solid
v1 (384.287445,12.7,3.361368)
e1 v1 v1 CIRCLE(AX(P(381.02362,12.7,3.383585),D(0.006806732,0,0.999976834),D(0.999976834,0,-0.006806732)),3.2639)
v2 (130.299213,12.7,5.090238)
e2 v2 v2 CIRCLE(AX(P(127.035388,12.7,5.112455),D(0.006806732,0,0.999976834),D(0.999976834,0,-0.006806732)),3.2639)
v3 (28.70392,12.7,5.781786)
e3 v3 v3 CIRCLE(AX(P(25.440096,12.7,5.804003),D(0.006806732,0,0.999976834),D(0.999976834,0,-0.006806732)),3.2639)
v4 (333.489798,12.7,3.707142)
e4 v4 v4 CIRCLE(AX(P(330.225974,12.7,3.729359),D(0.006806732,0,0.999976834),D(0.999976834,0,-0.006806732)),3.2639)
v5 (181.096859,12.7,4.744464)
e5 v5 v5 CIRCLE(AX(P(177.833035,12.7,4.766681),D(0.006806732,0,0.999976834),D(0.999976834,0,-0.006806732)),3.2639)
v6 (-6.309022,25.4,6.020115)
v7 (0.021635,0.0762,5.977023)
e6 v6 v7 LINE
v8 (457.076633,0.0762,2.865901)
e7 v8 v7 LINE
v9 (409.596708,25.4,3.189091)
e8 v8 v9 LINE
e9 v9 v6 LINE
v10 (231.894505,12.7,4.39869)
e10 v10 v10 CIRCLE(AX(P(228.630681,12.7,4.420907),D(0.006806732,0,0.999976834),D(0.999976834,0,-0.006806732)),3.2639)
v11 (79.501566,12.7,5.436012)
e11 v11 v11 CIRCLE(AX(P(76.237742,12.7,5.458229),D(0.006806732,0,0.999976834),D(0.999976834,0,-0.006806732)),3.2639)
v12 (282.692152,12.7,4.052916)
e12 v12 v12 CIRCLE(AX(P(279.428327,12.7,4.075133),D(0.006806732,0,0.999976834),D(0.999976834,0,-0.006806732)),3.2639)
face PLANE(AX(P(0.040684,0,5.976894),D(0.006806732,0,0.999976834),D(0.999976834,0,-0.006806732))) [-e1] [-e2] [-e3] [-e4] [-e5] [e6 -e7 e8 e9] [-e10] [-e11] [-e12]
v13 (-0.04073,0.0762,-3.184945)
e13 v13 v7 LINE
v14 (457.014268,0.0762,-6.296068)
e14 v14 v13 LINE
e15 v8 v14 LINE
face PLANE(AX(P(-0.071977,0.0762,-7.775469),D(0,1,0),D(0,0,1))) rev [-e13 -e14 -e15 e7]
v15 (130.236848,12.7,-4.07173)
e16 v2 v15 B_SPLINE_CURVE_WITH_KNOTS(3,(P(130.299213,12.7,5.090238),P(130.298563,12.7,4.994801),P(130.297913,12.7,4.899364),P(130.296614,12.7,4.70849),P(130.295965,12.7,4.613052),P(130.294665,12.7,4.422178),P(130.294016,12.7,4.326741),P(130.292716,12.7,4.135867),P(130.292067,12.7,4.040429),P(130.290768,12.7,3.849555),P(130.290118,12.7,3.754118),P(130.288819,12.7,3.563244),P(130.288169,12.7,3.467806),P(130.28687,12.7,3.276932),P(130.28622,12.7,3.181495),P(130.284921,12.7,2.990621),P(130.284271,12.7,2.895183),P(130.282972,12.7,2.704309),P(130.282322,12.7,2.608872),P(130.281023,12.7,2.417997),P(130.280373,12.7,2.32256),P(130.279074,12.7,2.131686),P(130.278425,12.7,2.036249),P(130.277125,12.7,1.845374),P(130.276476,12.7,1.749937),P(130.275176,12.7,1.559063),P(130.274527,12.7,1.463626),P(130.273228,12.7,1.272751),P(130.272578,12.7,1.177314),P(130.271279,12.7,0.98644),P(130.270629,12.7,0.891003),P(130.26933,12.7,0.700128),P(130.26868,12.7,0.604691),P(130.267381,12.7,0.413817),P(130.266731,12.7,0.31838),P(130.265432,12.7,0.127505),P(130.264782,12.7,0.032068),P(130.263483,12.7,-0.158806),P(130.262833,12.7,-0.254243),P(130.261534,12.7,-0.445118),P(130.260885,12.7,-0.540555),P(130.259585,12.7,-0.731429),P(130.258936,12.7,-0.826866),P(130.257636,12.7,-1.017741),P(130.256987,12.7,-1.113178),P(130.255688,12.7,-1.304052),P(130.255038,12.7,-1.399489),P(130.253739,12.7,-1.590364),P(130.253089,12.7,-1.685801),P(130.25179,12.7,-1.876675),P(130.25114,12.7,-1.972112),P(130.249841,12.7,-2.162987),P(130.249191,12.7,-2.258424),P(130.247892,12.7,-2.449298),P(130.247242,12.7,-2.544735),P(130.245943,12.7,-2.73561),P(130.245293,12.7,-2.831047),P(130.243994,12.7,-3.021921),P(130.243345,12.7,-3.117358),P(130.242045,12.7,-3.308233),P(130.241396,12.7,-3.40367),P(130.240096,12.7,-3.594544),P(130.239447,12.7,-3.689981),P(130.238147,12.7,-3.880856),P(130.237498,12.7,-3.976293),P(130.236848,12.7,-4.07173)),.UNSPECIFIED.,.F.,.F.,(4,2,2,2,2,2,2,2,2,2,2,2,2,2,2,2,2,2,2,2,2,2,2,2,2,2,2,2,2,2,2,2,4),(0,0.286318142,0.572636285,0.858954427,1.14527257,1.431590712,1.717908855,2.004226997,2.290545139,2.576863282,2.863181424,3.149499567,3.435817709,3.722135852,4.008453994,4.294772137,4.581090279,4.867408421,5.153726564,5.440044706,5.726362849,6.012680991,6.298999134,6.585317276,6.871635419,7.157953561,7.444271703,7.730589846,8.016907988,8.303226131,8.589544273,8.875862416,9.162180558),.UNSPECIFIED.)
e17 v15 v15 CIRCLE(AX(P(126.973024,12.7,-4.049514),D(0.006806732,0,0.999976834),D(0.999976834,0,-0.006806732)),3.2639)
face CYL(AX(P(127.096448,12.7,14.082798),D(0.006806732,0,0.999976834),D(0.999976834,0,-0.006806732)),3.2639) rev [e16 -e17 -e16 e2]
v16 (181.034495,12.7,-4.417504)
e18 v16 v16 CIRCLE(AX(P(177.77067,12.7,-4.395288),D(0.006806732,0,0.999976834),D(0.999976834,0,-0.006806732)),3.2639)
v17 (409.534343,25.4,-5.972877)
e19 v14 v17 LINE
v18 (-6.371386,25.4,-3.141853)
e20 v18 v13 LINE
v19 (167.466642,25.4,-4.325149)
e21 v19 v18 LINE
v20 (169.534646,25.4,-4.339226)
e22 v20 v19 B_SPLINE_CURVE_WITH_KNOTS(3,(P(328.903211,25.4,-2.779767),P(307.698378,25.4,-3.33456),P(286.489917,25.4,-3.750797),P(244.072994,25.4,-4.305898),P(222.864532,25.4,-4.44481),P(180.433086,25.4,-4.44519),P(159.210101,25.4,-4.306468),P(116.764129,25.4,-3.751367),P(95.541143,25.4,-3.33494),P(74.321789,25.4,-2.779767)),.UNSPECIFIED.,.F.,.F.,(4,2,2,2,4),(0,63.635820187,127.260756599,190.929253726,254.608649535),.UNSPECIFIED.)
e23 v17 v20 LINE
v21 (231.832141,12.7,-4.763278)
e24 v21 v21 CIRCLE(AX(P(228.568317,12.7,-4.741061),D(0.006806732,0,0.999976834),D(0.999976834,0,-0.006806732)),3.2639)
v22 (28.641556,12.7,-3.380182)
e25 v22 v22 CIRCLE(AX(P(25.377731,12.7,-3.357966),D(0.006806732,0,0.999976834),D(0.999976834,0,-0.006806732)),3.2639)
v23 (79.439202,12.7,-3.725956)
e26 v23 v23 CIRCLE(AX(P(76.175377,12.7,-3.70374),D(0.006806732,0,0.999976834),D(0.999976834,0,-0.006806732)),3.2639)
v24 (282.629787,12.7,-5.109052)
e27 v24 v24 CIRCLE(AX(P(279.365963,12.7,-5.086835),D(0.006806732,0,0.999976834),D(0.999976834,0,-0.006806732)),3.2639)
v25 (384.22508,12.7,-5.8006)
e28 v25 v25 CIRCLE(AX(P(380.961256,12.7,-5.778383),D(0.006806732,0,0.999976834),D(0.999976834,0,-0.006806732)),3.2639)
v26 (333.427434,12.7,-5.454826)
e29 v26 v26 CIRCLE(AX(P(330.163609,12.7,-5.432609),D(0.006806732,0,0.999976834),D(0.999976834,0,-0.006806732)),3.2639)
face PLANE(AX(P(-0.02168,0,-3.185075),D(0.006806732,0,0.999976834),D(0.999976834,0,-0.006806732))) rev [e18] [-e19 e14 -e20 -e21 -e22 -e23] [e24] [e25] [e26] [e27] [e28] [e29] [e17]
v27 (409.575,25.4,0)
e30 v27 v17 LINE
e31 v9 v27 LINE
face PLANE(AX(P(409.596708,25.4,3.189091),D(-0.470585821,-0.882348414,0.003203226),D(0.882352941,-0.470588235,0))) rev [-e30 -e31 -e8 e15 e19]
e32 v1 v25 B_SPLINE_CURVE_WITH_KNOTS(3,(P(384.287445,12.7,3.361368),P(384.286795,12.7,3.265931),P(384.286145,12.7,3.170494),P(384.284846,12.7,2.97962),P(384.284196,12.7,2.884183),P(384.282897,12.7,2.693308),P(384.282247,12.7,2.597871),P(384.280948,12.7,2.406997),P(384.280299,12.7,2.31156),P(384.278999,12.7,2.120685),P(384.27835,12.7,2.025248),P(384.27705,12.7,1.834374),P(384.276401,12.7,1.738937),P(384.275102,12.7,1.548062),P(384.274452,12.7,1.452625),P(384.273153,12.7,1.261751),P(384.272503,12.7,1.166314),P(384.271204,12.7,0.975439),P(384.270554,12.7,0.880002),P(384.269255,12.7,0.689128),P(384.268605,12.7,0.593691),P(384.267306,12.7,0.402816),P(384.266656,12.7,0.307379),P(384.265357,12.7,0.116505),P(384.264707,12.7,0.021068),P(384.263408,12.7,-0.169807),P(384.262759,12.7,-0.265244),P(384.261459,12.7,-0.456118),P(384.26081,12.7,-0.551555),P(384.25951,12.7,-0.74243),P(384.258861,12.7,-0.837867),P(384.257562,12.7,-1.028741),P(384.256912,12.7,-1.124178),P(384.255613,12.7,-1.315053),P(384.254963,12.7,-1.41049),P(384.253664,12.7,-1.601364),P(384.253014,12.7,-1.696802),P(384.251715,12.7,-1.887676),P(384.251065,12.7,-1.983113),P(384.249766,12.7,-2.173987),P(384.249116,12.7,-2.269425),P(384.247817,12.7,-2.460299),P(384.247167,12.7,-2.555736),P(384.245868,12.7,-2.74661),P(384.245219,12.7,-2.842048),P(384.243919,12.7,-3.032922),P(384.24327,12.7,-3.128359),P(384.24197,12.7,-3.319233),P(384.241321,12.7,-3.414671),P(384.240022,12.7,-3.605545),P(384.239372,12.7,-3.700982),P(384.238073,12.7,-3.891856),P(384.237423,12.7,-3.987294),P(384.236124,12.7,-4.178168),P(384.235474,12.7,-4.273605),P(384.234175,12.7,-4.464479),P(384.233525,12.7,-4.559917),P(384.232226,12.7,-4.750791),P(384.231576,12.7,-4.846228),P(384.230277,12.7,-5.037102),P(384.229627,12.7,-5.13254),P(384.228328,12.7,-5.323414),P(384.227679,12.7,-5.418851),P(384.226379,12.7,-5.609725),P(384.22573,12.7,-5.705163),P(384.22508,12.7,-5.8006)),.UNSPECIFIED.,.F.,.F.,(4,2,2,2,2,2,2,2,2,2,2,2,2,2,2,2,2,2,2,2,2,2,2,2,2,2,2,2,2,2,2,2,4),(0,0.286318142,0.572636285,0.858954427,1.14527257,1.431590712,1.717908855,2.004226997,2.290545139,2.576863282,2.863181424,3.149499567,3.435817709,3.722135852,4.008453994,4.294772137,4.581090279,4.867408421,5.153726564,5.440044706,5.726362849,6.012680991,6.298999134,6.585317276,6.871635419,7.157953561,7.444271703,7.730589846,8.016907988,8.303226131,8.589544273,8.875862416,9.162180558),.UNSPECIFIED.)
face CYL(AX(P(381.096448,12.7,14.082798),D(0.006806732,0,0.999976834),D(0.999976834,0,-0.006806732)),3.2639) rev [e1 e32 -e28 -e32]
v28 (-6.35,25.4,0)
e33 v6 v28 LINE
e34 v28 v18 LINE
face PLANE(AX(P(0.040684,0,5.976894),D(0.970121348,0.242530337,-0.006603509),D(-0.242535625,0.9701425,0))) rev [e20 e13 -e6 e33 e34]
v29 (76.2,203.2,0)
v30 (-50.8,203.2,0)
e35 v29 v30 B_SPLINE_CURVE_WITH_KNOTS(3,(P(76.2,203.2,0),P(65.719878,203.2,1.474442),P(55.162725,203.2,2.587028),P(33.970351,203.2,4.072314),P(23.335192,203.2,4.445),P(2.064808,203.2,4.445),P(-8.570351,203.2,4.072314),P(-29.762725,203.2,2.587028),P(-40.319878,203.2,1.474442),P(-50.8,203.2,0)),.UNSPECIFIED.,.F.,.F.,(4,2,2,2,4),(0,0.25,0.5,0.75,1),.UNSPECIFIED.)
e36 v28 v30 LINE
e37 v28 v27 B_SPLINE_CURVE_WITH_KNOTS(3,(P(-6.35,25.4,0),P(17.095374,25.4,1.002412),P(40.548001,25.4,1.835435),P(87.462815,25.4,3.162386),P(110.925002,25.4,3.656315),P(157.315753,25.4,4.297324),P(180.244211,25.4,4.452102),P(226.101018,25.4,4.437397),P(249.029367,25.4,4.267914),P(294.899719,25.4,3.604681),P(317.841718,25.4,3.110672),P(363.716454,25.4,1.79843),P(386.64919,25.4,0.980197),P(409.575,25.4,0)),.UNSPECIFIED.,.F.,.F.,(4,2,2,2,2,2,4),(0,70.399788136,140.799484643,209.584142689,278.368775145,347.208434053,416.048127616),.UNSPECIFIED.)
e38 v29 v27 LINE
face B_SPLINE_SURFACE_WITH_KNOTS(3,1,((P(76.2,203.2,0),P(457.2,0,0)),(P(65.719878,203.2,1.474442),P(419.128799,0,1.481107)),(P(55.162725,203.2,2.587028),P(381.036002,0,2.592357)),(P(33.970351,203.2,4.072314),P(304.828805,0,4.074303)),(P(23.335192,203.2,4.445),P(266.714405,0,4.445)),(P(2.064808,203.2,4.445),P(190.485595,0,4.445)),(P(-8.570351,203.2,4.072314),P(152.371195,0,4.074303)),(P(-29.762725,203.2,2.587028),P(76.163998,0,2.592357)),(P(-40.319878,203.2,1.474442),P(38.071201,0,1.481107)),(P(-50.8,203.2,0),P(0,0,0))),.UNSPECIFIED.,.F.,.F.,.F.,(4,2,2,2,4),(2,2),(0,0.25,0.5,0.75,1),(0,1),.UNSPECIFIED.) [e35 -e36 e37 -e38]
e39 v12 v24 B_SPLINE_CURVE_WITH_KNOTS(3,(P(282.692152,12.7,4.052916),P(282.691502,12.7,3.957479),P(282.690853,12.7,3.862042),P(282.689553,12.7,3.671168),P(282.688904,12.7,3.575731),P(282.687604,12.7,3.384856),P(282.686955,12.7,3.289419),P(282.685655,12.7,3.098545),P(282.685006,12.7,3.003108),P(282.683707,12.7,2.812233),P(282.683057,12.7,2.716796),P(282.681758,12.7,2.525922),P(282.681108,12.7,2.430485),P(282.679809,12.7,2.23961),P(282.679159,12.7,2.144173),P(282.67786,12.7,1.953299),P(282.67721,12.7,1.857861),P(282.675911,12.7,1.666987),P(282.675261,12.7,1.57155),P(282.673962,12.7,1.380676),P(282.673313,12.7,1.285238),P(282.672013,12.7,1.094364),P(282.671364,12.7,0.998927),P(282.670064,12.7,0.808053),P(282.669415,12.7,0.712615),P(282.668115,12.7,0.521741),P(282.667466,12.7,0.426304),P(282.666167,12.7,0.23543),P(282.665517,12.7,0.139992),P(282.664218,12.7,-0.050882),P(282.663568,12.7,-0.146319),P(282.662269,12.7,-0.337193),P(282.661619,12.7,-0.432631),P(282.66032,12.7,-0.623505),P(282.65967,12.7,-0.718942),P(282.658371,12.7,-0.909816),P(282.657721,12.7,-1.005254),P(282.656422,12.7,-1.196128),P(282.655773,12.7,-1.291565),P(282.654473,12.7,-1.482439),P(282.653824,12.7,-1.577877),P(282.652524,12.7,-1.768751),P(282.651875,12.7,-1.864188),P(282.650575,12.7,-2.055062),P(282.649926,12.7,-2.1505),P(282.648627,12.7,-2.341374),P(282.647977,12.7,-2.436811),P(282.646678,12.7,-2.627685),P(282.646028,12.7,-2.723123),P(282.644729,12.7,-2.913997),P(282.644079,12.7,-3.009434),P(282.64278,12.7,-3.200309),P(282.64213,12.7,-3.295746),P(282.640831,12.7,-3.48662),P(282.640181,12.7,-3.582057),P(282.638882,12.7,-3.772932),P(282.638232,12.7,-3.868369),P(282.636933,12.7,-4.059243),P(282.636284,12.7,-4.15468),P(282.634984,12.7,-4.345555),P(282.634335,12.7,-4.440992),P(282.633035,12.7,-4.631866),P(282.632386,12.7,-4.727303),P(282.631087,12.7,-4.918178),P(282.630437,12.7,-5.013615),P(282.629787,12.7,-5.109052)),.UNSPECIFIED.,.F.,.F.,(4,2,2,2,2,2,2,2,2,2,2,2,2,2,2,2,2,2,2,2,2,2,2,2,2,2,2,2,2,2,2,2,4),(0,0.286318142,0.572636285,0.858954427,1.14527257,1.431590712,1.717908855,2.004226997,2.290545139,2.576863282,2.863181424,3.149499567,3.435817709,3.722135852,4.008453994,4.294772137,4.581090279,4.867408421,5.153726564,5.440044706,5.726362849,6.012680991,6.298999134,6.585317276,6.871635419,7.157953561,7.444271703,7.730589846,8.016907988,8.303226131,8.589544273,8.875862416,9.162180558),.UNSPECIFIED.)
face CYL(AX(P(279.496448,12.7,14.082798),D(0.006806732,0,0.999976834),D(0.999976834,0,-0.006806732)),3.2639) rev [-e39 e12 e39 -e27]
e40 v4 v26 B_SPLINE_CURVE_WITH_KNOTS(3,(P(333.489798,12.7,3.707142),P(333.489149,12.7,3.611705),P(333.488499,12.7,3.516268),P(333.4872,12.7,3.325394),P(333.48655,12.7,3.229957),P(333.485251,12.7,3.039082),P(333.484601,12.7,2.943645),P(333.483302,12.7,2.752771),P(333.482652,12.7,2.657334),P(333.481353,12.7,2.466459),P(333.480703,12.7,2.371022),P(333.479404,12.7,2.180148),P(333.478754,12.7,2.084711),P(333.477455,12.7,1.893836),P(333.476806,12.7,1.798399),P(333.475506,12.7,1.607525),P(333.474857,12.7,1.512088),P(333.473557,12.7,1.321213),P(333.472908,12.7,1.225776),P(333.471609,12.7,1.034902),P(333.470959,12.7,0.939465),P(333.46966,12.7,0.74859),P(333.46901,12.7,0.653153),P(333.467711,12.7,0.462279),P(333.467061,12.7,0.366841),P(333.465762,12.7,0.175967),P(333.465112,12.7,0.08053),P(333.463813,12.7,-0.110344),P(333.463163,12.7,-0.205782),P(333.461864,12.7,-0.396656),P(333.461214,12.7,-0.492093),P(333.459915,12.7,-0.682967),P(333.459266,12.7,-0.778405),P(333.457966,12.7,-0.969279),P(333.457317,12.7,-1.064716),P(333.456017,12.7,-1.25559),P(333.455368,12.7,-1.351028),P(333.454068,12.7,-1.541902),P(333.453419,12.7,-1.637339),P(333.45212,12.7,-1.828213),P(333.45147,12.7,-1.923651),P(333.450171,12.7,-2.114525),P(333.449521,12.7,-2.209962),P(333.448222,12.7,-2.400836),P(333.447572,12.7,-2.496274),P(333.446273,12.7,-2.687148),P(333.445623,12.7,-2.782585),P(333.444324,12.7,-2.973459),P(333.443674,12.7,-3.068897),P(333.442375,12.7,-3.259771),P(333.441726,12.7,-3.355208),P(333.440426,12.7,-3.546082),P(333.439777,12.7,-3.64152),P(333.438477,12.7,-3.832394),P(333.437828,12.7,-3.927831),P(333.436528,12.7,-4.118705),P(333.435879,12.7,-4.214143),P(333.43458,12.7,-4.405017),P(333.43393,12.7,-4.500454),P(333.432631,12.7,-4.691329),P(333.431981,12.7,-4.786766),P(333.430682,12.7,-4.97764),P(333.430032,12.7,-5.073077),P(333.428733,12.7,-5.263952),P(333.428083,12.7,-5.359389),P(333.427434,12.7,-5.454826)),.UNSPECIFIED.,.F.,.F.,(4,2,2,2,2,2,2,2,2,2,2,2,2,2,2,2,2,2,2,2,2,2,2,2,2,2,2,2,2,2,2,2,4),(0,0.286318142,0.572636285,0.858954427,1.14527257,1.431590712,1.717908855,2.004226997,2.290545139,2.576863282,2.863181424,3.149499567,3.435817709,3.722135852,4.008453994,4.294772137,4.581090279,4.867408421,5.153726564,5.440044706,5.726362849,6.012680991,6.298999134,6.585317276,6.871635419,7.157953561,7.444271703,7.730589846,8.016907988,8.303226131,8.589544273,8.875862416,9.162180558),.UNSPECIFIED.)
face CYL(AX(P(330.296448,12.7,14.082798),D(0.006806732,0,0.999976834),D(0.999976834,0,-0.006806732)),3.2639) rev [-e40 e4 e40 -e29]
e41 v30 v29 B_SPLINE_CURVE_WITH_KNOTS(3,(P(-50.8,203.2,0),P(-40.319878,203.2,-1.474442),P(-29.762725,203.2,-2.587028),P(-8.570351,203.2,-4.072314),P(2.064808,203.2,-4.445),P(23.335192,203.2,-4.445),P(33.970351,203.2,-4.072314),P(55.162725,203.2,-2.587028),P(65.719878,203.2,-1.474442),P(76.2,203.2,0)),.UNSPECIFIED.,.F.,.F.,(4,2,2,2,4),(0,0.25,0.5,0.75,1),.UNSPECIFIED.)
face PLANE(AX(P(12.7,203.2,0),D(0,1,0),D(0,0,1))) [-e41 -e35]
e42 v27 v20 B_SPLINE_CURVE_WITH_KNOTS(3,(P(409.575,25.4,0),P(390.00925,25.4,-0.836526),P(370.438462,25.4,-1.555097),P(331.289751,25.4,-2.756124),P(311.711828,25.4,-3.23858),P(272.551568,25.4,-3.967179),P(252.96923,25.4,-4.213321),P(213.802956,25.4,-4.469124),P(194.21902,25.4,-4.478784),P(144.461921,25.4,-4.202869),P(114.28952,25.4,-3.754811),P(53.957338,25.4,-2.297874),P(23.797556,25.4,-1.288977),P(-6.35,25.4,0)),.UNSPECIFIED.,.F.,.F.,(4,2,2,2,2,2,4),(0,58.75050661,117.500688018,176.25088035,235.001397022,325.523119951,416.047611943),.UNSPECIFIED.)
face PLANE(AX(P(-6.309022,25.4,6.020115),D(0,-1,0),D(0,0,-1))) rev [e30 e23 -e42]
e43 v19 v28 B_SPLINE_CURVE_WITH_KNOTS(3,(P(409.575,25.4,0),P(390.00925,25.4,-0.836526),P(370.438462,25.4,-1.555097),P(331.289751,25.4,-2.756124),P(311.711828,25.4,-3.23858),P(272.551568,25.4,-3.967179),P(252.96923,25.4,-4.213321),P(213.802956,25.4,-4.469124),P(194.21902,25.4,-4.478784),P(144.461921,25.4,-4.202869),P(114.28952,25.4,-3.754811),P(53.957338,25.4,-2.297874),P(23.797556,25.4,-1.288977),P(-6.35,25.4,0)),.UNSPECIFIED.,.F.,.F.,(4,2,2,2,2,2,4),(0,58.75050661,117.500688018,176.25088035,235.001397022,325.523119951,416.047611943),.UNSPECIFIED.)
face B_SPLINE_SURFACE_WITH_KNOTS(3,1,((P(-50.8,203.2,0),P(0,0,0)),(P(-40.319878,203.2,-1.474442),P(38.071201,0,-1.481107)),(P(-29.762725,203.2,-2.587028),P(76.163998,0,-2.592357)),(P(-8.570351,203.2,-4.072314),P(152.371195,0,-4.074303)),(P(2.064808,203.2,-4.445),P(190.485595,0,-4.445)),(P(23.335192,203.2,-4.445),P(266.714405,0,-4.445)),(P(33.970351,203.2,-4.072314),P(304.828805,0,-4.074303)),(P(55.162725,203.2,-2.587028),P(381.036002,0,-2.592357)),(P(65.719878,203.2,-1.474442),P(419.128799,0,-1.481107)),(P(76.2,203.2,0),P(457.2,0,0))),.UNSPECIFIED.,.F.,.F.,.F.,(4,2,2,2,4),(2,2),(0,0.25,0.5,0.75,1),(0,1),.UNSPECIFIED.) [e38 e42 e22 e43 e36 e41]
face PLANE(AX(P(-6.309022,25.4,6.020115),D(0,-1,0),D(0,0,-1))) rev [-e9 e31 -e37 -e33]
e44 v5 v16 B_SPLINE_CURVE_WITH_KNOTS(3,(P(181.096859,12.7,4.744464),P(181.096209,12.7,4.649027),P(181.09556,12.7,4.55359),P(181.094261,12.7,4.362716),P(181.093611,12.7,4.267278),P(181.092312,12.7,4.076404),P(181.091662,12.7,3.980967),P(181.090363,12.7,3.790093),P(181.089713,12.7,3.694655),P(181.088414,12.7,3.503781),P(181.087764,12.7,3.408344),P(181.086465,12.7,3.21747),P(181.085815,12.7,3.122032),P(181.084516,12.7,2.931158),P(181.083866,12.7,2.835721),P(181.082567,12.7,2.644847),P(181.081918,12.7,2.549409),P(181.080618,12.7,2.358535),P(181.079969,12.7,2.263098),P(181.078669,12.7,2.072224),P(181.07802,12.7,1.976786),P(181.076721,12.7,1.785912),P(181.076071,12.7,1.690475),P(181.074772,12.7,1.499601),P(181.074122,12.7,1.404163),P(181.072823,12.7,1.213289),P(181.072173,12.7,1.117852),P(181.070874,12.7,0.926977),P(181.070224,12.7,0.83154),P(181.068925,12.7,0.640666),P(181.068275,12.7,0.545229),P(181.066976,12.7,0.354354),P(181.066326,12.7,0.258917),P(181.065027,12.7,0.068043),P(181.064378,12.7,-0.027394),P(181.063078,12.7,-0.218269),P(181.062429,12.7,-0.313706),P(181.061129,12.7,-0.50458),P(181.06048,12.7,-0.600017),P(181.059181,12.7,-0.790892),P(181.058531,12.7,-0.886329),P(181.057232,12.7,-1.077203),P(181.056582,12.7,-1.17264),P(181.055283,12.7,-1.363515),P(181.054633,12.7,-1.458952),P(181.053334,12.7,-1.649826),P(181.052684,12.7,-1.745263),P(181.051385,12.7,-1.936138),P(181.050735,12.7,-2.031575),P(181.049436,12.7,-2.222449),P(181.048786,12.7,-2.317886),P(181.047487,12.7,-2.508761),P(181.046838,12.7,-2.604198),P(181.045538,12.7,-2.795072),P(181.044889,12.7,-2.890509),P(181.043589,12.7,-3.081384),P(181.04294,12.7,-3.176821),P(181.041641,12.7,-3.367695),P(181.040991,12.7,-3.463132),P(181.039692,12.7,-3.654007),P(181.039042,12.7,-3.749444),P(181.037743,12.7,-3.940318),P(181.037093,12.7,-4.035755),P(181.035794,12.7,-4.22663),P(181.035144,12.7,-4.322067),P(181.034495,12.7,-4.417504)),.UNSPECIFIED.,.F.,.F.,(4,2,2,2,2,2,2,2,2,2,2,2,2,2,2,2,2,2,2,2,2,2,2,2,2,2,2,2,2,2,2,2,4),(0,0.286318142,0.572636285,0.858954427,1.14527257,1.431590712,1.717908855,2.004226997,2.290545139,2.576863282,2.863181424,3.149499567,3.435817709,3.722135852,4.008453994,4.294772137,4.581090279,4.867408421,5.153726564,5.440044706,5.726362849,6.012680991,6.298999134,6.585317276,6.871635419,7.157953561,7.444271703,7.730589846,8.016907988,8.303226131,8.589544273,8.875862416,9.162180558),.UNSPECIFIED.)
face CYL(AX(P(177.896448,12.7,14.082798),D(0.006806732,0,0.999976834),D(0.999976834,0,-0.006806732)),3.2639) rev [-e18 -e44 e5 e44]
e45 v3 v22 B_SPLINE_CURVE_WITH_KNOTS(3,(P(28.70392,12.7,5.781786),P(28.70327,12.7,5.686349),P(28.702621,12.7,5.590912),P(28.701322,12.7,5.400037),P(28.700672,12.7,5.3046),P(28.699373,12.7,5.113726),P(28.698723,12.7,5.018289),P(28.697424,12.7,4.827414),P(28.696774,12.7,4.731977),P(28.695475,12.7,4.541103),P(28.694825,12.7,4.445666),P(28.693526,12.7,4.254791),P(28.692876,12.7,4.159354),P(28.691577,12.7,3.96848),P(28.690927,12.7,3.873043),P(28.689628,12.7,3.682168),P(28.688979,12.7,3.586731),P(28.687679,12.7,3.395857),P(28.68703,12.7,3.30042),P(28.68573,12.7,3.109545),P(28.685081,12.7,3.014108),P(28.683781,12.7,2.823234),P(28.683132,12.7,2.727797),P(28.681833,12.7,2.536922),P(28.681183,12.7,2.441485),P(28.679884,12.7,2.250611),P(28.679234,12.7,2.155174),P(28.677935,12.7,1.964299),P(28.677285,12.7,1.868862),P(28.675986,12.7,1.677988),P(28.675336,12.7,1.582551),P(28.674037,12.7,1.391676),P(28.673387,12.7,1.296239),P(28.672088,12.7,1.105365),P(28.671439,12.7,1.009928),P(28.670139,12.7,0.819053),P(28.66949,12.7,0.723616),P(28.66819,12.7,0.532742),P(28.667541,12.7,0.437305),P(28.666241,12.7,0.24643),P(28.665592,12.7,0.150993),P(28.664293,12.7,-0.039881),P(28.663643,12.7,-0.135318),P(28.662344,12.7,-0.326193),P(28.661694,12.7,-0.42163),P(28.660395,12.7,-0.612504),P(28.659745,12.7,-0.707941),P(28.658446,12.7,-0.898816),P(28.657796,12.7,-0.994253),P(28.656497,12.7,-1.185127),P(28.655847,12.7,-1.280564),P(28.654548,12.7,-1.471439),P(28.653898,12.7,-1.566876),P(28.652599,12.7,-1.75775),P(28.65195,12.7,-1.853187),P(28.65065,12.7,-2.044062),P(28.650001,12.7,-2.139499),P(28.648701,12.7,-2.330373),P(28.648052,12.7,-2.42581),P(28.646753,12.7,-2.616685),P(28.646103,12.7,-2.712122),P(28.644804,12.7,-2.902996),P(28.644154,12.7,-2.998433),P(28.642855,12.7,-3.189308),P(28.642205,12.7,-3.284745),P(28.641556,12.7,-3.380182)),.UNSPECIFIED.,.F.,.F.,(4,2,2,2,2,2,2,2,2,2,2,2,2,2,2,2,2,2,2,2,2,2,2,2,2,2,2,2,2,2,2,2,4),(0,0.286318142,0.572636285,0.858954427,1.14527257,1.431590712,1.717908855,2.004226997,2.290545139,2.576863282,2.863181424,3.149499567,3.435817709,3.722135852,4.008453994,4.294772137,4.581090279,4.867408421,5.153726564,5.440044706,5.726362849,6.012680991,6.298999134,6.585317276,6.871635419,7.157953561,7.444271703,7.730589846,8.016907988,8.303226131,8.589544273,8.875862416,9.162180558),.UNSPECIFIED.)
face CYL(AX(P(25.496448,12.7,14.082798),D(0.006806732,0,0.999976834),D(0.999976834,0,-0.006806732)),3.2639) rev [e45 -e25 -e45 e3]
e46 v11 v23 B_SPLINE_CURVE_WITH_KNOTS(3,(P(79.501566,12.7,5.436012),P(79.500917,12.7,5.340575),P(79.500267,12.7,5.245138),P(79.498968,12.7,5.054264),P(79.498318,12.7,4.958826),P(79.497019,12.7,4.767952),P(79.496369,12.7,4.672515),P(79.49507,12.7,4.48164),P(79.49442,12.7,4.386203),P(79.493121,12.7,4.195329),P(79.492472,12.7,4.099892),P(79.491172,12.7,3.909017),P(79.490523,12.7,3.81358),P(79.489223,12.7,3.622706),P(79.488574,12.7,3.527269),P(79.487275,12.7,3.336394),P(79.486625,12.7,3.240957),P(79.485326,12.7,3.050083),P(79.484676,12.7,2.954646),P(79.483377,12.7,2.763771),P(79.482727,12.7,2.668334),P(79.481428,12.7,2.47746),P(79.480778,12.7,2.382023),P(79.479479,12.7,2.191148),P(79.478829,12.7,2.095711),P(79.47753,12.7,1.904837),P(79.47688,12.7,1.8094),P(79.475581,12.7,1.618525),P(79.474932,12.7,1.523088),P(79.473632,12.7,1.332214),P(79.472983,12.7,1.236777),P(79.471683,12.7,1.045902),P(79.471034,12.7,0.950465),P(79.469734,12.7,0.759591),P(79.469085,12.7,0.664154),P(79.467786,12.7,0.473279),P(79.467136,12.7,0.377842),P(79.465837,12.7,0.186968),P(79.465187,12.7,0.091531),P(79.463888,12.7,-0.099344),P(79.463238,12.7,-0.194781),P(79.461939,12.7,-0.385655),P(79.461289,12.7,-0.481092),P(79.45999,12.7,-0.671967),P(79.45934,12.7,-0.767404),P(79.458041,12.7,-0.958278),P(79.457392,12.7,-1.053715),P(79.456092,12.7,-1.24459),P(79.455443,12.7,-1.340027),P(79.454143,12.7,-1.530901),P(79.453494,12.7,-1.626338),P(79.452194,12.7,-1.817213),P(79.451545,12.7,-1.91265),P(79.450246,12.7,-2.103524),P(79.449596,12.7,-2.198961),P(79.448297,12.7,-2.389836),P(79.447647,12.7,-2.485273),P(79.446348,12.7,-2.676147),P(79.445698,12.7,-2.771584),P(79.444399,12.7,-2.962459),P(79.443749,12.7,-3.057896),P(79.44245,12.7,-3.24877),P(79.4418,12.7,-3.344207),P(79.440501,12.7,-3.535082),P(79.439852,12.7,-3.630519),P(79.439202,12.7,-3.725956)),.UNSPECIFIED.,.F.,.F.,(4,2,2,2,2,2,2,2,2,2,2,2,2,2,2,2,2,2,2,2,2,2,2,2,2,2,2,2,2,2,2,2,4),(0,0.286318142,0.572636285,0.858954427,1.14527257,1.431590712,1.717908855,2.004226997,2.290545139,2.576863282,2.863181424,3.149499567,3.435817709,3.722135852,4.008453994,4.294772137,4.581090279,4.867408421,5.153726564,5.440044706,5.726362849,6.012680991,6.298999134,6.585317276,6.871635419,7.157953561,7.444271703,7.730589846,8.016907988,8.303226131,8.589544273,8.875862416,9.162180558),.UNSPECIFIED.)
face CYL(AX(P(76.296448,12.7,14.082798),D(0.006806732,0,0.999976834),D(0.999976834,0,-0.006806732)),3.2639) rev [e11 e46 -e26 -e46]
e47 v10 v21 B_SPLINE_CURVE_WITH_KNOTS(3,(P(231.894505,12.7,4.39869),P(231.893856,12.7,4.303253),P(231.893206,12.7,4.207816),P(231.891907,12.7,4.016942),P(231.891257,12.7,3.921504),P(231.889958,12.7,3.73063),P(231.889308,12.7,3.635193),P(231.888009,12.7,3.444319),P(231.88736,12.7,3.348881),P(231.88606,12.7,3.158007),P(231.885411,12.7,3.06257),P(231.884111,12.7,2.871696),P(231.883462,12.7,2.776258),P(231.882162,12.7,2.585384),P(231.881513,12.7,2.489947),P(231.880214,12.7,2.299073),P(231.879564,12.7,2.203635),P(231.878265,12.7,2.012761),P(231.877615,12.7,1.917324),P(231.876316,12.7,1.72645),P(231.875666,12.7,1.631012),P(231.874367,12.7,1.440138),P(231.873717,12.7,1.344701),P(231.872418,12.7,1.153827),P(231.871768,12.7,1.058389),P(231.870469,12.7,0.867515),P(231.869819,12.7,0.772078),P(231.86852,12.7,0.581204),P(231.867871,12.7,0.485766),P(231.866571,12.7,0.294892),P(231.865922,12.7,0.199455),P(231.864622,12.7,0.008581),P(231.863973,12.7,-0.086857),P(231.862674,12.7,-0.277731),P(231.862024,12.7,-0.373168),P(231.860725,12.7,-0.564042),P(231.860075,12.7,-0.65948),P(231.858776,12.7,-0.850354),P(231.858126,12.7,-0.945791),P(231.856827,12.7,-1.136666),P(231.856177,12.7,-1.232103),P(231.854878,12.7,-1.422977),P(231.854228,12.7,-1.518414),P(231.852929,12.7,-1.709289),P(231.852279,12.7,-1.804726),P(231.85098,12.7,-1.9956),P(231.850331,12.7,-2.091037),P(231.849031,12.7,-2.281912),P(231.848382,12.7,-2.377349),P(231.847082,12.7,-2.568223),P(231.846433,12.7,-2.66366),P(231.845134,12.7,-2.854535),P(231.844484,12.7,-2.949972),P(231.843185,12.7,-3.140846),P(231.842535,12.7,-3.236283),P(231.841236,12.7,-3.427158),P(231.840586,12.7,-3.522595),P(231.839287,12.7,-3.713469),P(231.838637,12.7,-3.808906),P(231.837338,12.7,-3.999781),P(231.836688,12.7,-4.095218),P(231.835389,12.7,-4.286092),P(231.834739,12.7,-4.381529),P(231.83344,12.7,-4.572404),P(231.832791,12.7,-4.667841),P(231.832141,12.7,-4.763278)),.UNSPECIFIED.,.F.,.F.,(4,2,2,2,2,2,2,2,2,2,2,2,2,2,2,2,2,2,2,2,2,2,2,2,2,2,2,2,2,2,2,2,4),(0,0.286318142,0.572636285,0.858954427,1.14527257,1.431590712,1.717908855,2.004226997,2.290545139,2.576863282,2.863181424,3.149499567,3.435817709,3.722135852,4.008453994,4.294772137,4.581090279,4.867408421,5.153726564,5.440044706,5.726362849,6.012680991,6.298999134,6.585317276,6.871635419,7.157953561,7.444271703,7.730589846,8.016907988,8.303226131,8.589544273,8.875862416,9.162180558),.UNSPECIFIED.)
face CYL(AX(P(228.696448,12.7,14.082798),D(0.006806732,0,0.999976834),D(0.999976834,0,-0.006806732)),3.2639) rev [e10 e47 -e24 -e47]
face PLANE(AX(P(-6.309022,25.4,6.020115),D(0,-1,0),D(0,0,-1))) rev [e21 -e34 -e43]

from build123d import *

# Parameters (mm, degrees)
BOSS_EXTRUDE1_DEPTH     = 9.162180558
CUT_EXTRUDE1_DEPTH      = 501.37942121
CUT_EXTRUDE1_DEPTH_BACK = 501.37942121
SKETCH12_W              = 6.35
SKETCH12_H              = 25.4
F_1_4_CLEARANCE_HOLE1_D = 6.5278
LPATTERN1_COUNT         = 8
LPATTERN1_PITCH         = 50.8
SKETCH14_W              = 457.208458034
SKETCH14_H              = 25.4
CUT_EXTRUDE2_DEPTH      = 501.453155036


with BuildPart() as part:
    # Sketch5 for Loft4 → Loft4 section 0
    with BuildSketch(Plane(origin=(0, 203.2, 0), x_dir=(1, 0, 0), z_dir=(0, 1, 0))):
        with BuildLine():
            # circular arc as an exact rational Bezier (weights 1, cos(half-angle), 1)
            Bezier((-50.8, 0), (12.7, 8.9337755), (76.2, 0), weights=[1, 0.990247786, 1])
            Bezier((76.2, 0), (12.7, -8.9337755), (-50.8, 0), weights=[1, 0.990247786, 1])
        make_face()
    # Sketch1 for Loft4 → Loft4 section 1
    with BuildSketch(Plane(origin=(0, 0, 0), x_dir=(1, 0, 0), z_dir=(0, 1, 0))):
        with BuildLine():
            Bezier((0, 0), (228.6, 8.89336246), (457.2, 0), weights=[1, 0.999244113, 1])
            Bezier((457.2, 0), (228.6, -8.89336246), (0, 0), weights=[1, 0.999244113, 1])
        make_face()
    loft()

    # Sketch10 → Boss-Extrude1 (add)
    with BuildSketch(Plane(origin=(-0.021680451, 0, -3.185074689), x_dir=(0, -1, 0), z_dir=(0.006806731520561807, 0, 0.9999768339346702))):
        Polygon((0, 457.189408475), (0, 0), (-25.4, -6.349852895), (-25.4, 409.565511759), align=None)
    extrude(amount=BOSS_EXTRUDE1_DEPTH)

    # Sketch12 → Cut-Extrude1 (cut, two sides: drawn at the far end of the back side and taken through both)
    with BuildSketch(Plane(origin=(0, 0, 0), x_dir=(0.006806731520561807, 0, 0.9999768339346702), z_dir=(-0.9999768339346702, 0, 0.006806731520561807)).offset(-CUT_EXTRUDE1_DEPTH_BACK)):
        with Locations((9.152032082, 12.7)):
            Rectangle(SKETCH12_W, SKETCH12_H)
        with Locations((-6.360148476, 12.7)):
            Rectangle(SKETCH12_W, SKETCH12_H)
    extrude(amount=CUT_EXTRUDE1_DEPTH + CUT_EXTRUDE1_DEPTH_BACK, mode=Mode.SUBTRACT)

    # 1/4 Clearance Hole1 (through all)
    with Locations(Plane(origin=(0.097036893, 0, 14.25568857), x_dir=(0, -1, 0), z_dir=(0.006806731520561807, 0, 0.9999768339346702))):
        with Locations((-12.7, 25.4)):
            f_1_4_clearance_hole1 = Hole(F_1_4_CLEARANCE_HOLE1_D / 2)

    # LPattern1: 1/4 Clearance Hole1 ×8
    with Locations(*[(i * LPATTERN1_PITCH, 0, 0) for i in range(1, LPATTERN1_COUNT)]):
        add(f_1_4_clearance_hole1, mode=Mode.SUBTRACT)

    # Sketch14 → Cut-Extrude2 (cut, through all)
    with BuildSketch(Plane(origin=(0.040684053, 0, 5.976893617), x_dir=(0.9999768339346702, 0, -0.006806731520561792), z_dir=(0.006806731520561792, 0, 0.9999768339346703))):
        with Locations((228.585179458, -12.6238)):
            Rectangle(SKETCH14_W, SKETCH14_H)
    extrude(amount=-CUT_EXTRUDE2_DEPTH, mode=Mode.SUBTRACT)


solid = part.part
